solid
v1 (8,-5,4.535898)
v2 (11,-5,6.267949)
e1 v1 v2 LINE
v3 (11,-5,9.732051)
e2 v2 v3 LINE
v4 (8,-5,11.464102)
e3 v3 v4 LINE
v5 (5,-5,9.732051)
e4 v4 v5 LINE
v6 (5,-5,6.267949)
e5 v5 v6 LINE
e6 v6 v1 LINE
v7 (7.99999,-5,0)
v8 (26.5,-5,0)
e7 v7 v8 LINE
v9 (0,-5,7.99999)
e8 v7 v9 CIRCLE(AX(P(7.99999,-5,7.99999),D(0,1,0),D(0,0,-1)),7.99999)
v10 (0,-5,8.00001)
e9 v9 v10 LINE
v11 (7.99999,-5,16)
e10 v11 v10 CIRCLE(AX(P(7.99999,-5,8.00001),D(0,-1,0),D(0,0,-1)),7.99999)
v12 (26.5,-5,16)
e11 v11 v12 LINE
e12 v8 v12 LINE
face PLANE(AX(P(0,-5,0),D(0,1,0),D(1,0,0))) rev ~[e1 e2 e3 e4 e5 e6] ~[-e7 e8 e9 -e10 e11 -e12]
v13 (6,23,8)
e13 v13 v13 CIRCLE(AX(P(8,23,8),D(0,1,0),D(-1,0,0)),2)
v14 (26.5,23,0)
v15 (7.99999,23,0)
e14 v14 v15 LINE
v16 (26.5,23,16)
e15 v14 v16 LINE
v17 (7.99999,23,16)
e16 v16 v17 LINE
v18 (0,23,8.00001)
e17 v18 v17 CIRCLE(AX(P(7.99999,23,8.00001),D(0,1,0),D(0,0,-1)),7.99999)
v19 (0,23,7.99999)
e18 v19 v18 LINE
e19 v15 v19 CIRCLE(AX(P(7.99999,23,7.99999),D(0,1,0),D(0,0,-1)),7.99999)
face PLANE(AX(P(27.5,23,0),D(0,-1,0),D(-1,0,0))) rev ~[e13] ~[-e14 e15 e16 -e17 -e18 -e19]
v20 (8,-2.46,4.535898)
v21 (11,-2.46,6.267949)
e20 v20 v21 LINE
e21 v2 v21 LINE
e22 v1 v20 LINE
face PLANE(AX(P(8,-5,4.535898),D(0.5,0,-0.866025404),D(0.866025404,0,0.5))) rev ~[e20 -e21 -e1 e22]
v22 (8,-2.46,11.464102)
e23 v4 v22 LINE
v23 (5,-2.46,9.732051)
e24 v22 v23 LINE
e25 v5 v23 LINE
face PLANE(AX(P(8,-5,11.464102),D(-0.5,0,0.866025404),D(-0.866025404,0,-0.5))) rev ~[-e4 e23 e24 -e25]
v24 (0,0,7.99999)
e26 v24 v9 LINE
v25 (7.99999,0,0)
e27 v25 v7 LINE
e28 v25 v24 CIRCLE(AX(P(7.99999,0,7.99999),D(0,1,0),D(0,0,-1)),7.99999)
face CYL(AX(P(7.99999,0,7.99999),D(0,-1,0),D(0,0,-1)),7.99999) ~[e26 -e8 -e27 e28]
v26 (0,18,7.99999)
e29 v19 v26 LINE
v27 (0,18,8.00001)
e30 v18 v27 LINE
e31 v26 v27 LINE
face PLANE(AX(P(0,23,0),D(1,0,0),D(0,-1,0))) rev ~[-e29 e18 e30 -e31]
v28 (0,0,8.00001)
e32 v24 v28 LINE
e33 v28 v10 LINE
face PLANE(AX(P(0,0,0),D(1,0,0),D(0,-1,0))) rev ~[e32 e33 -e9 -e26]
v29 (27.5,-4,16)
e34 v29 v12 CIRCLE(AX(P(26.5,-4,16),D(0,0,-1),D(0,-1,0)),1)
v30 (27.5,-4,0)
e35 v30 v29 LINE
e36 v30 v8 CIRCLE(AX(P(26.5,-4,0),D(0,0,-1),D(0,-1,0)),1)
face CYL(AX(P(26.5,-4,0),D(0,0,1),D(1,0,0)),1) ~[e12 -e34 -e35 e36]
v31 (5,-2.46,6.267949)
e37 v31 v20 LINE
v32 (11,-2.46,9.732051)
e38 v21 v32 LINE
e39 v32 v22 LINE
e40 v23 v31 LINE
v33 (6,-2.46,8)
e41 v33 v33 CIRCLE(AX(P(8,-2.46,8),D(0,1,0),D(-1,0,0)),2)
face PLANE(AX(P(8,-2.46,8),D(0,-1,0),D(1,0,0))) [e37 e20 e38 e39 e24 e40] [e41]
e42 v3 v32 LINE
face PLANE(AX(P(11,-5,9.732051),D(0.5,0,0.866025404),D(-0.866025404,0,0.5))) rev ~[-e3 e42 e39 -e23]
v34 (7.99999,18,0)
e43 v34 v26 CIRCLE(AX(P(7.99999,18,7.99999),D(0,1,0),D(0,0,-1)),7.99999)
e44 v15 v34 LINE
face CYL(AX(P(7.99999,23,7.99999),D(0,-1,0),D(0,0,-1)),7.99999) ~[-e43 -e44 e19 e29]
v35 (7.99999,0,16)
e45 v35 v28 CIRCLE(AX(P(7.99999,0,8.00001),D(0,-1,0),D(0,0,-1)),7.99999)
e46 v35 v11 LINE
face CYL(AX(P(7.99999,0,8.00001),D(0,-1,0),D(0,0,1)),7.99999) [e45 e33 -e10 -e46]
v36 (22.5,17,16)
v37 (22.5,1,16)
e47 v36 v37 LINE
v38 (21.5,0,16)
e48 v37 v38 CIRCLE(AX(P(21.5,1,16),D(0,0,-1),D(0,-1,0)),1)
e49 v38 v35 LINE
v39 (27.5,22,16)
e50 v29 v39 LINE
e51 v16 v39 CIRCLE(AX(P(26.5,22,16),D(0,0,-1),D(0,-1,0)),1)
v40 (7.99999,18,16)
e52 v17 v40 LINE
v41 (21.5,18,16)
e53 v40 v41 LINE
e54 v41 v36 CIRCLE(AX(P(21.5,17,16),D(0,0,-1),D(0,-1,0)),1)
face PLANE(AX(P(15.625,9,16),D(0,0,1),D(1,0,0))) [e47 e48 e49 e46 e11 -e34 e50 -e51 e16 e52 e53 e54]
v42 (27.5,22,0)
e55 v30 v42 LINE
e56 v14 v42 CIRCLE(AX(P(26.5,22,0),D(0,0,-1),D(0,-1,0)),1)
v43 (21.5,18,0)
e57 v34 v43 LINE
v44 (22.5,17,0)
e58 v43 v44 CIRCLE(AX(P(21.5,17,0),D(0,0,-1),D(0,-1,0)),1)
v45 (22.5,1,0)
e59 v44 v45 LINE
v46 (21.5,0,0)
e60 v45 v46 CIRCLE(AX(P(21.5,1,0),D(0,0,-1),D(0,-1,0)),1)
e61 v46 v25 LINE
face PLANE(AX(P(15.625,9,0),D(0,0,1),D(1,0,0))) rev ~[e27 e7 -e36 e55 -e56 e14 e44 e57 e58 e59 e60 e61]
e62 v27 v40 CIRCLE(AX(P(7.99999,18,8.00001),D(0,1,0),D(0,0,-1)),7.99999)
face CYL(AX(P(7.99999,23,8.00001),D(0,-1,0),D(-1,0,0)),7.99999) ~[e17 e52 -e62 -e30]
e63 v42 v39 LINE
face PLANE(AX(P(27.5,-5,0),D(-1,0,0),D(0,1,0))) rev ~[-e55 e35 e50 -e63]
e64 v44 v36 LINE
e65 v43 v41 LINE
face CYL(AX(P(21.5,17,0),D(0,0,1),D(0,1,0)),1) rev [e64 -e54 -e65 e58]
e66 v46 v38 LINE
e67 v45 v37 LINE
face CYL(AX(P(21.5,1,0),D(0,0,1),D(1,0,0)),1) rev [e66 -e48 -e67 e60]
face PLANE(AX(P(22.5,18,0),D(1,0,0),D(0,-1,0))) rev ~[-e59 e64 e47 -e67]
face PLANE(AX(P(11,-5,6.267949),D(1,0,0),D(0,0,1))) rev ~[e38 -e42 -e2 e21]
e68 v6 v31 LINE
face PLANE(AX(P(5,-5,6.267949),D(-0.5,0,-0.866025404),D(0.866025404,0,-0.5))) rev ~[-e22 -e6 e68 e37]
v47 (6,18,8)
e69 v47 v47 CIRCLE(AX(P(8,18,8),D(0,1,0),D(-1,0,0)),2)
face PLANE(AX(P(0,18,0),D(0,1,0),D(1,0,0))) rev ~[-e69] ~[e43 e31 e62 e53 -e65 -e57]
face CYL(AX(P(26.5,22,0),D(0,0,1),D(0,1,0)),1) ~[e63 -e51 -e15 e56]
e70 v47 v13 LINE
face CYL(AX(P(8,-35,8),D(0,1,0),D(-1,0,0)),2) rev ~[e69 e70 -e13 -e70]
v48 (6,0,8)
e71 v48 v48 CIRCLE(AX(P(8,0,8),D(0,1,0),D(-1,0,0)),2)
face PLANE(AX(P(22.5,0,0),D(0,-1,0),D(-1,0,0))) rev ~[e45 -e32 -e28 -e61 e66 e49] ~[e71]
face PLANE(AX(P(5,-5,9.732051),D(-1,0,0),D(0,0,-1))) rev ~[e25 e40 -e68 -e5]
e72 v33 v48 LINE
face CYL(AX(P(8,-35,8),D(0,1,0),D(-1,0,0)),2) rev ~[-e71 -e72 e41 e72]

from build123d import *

# Parameters (mm, degrees)
F1_DEPTH = 16
F3_D     = 4
F3_DEPTH = 30
F3_TIP   = 1.2017212381
F4_R     = 1
F5_R     = 7.99999
F6_DEPTH = 2.54


# Not quite as in the source:
# - a fillet or chamfer is up to 0.001 mm smaller than in the source, because OpenCascade refuses the exact size


with BuildPart() as f1:
    # F0 (on Top) → F1 (new body)
    with BuildSketch(Plane.XY):
        Polygon((0, 23), (0, 18), (22.5, 18), (22.5, 0), (0, 0), (0, -5), (27.5, -5), (27.5, 23), align=None)
    extrude(amount=F1_DEPTH)

    # F3
    with Locations(Plane.XZ.offset(5)):
        with Locations((8, 8)):
            Hole(F3_D / 2, depth=F3_DEPTH)
            with Locations((0, 0, -(F3_DEPTH + F3_TIP / 2))):  # 118° drill point
                Cone(0, F3_D / 2, F3_TIP, mode=Mode.SUBTRACT)

    # F4
    f4_edges = [f1.edges().sort_by_distance(p)[0] for p in [
        (22.5, 18, 8),
        (22.5, 0, 8),
        (27.5, -5, 8),
        (27.5, 23, 8),
    ]]
    fillet(f4_edges, radius=F4_R)

    # F5 (radius 8 in the source; OpenCascade refuses exactly that, so slightly less here)
    f5_edges = [f1.edges().sort_by_distance(p)[0] for p in [
        (0, -2.5, 16),
        (0, 20.5, 16),
        (0, -2.5, 0),
        (0, 20.5, 0),
    ]]
    fillet(f5_edges, radius=F5_R)

    # F2 (on face) → F6 (cut)
    with BuildSketch(Plane.XZ.offset(5)):
        Polygon((11, 6.2679491924), (11, 9.7320508076), (8, 11.4641016151), (5, 9.7320508076), (5, 6.2679491924), (8, 4.5358983849), align=None)
    extrude(amount=-F6_DEPTH, mode=Mode.SUBTRACT)


solid = f1.part
